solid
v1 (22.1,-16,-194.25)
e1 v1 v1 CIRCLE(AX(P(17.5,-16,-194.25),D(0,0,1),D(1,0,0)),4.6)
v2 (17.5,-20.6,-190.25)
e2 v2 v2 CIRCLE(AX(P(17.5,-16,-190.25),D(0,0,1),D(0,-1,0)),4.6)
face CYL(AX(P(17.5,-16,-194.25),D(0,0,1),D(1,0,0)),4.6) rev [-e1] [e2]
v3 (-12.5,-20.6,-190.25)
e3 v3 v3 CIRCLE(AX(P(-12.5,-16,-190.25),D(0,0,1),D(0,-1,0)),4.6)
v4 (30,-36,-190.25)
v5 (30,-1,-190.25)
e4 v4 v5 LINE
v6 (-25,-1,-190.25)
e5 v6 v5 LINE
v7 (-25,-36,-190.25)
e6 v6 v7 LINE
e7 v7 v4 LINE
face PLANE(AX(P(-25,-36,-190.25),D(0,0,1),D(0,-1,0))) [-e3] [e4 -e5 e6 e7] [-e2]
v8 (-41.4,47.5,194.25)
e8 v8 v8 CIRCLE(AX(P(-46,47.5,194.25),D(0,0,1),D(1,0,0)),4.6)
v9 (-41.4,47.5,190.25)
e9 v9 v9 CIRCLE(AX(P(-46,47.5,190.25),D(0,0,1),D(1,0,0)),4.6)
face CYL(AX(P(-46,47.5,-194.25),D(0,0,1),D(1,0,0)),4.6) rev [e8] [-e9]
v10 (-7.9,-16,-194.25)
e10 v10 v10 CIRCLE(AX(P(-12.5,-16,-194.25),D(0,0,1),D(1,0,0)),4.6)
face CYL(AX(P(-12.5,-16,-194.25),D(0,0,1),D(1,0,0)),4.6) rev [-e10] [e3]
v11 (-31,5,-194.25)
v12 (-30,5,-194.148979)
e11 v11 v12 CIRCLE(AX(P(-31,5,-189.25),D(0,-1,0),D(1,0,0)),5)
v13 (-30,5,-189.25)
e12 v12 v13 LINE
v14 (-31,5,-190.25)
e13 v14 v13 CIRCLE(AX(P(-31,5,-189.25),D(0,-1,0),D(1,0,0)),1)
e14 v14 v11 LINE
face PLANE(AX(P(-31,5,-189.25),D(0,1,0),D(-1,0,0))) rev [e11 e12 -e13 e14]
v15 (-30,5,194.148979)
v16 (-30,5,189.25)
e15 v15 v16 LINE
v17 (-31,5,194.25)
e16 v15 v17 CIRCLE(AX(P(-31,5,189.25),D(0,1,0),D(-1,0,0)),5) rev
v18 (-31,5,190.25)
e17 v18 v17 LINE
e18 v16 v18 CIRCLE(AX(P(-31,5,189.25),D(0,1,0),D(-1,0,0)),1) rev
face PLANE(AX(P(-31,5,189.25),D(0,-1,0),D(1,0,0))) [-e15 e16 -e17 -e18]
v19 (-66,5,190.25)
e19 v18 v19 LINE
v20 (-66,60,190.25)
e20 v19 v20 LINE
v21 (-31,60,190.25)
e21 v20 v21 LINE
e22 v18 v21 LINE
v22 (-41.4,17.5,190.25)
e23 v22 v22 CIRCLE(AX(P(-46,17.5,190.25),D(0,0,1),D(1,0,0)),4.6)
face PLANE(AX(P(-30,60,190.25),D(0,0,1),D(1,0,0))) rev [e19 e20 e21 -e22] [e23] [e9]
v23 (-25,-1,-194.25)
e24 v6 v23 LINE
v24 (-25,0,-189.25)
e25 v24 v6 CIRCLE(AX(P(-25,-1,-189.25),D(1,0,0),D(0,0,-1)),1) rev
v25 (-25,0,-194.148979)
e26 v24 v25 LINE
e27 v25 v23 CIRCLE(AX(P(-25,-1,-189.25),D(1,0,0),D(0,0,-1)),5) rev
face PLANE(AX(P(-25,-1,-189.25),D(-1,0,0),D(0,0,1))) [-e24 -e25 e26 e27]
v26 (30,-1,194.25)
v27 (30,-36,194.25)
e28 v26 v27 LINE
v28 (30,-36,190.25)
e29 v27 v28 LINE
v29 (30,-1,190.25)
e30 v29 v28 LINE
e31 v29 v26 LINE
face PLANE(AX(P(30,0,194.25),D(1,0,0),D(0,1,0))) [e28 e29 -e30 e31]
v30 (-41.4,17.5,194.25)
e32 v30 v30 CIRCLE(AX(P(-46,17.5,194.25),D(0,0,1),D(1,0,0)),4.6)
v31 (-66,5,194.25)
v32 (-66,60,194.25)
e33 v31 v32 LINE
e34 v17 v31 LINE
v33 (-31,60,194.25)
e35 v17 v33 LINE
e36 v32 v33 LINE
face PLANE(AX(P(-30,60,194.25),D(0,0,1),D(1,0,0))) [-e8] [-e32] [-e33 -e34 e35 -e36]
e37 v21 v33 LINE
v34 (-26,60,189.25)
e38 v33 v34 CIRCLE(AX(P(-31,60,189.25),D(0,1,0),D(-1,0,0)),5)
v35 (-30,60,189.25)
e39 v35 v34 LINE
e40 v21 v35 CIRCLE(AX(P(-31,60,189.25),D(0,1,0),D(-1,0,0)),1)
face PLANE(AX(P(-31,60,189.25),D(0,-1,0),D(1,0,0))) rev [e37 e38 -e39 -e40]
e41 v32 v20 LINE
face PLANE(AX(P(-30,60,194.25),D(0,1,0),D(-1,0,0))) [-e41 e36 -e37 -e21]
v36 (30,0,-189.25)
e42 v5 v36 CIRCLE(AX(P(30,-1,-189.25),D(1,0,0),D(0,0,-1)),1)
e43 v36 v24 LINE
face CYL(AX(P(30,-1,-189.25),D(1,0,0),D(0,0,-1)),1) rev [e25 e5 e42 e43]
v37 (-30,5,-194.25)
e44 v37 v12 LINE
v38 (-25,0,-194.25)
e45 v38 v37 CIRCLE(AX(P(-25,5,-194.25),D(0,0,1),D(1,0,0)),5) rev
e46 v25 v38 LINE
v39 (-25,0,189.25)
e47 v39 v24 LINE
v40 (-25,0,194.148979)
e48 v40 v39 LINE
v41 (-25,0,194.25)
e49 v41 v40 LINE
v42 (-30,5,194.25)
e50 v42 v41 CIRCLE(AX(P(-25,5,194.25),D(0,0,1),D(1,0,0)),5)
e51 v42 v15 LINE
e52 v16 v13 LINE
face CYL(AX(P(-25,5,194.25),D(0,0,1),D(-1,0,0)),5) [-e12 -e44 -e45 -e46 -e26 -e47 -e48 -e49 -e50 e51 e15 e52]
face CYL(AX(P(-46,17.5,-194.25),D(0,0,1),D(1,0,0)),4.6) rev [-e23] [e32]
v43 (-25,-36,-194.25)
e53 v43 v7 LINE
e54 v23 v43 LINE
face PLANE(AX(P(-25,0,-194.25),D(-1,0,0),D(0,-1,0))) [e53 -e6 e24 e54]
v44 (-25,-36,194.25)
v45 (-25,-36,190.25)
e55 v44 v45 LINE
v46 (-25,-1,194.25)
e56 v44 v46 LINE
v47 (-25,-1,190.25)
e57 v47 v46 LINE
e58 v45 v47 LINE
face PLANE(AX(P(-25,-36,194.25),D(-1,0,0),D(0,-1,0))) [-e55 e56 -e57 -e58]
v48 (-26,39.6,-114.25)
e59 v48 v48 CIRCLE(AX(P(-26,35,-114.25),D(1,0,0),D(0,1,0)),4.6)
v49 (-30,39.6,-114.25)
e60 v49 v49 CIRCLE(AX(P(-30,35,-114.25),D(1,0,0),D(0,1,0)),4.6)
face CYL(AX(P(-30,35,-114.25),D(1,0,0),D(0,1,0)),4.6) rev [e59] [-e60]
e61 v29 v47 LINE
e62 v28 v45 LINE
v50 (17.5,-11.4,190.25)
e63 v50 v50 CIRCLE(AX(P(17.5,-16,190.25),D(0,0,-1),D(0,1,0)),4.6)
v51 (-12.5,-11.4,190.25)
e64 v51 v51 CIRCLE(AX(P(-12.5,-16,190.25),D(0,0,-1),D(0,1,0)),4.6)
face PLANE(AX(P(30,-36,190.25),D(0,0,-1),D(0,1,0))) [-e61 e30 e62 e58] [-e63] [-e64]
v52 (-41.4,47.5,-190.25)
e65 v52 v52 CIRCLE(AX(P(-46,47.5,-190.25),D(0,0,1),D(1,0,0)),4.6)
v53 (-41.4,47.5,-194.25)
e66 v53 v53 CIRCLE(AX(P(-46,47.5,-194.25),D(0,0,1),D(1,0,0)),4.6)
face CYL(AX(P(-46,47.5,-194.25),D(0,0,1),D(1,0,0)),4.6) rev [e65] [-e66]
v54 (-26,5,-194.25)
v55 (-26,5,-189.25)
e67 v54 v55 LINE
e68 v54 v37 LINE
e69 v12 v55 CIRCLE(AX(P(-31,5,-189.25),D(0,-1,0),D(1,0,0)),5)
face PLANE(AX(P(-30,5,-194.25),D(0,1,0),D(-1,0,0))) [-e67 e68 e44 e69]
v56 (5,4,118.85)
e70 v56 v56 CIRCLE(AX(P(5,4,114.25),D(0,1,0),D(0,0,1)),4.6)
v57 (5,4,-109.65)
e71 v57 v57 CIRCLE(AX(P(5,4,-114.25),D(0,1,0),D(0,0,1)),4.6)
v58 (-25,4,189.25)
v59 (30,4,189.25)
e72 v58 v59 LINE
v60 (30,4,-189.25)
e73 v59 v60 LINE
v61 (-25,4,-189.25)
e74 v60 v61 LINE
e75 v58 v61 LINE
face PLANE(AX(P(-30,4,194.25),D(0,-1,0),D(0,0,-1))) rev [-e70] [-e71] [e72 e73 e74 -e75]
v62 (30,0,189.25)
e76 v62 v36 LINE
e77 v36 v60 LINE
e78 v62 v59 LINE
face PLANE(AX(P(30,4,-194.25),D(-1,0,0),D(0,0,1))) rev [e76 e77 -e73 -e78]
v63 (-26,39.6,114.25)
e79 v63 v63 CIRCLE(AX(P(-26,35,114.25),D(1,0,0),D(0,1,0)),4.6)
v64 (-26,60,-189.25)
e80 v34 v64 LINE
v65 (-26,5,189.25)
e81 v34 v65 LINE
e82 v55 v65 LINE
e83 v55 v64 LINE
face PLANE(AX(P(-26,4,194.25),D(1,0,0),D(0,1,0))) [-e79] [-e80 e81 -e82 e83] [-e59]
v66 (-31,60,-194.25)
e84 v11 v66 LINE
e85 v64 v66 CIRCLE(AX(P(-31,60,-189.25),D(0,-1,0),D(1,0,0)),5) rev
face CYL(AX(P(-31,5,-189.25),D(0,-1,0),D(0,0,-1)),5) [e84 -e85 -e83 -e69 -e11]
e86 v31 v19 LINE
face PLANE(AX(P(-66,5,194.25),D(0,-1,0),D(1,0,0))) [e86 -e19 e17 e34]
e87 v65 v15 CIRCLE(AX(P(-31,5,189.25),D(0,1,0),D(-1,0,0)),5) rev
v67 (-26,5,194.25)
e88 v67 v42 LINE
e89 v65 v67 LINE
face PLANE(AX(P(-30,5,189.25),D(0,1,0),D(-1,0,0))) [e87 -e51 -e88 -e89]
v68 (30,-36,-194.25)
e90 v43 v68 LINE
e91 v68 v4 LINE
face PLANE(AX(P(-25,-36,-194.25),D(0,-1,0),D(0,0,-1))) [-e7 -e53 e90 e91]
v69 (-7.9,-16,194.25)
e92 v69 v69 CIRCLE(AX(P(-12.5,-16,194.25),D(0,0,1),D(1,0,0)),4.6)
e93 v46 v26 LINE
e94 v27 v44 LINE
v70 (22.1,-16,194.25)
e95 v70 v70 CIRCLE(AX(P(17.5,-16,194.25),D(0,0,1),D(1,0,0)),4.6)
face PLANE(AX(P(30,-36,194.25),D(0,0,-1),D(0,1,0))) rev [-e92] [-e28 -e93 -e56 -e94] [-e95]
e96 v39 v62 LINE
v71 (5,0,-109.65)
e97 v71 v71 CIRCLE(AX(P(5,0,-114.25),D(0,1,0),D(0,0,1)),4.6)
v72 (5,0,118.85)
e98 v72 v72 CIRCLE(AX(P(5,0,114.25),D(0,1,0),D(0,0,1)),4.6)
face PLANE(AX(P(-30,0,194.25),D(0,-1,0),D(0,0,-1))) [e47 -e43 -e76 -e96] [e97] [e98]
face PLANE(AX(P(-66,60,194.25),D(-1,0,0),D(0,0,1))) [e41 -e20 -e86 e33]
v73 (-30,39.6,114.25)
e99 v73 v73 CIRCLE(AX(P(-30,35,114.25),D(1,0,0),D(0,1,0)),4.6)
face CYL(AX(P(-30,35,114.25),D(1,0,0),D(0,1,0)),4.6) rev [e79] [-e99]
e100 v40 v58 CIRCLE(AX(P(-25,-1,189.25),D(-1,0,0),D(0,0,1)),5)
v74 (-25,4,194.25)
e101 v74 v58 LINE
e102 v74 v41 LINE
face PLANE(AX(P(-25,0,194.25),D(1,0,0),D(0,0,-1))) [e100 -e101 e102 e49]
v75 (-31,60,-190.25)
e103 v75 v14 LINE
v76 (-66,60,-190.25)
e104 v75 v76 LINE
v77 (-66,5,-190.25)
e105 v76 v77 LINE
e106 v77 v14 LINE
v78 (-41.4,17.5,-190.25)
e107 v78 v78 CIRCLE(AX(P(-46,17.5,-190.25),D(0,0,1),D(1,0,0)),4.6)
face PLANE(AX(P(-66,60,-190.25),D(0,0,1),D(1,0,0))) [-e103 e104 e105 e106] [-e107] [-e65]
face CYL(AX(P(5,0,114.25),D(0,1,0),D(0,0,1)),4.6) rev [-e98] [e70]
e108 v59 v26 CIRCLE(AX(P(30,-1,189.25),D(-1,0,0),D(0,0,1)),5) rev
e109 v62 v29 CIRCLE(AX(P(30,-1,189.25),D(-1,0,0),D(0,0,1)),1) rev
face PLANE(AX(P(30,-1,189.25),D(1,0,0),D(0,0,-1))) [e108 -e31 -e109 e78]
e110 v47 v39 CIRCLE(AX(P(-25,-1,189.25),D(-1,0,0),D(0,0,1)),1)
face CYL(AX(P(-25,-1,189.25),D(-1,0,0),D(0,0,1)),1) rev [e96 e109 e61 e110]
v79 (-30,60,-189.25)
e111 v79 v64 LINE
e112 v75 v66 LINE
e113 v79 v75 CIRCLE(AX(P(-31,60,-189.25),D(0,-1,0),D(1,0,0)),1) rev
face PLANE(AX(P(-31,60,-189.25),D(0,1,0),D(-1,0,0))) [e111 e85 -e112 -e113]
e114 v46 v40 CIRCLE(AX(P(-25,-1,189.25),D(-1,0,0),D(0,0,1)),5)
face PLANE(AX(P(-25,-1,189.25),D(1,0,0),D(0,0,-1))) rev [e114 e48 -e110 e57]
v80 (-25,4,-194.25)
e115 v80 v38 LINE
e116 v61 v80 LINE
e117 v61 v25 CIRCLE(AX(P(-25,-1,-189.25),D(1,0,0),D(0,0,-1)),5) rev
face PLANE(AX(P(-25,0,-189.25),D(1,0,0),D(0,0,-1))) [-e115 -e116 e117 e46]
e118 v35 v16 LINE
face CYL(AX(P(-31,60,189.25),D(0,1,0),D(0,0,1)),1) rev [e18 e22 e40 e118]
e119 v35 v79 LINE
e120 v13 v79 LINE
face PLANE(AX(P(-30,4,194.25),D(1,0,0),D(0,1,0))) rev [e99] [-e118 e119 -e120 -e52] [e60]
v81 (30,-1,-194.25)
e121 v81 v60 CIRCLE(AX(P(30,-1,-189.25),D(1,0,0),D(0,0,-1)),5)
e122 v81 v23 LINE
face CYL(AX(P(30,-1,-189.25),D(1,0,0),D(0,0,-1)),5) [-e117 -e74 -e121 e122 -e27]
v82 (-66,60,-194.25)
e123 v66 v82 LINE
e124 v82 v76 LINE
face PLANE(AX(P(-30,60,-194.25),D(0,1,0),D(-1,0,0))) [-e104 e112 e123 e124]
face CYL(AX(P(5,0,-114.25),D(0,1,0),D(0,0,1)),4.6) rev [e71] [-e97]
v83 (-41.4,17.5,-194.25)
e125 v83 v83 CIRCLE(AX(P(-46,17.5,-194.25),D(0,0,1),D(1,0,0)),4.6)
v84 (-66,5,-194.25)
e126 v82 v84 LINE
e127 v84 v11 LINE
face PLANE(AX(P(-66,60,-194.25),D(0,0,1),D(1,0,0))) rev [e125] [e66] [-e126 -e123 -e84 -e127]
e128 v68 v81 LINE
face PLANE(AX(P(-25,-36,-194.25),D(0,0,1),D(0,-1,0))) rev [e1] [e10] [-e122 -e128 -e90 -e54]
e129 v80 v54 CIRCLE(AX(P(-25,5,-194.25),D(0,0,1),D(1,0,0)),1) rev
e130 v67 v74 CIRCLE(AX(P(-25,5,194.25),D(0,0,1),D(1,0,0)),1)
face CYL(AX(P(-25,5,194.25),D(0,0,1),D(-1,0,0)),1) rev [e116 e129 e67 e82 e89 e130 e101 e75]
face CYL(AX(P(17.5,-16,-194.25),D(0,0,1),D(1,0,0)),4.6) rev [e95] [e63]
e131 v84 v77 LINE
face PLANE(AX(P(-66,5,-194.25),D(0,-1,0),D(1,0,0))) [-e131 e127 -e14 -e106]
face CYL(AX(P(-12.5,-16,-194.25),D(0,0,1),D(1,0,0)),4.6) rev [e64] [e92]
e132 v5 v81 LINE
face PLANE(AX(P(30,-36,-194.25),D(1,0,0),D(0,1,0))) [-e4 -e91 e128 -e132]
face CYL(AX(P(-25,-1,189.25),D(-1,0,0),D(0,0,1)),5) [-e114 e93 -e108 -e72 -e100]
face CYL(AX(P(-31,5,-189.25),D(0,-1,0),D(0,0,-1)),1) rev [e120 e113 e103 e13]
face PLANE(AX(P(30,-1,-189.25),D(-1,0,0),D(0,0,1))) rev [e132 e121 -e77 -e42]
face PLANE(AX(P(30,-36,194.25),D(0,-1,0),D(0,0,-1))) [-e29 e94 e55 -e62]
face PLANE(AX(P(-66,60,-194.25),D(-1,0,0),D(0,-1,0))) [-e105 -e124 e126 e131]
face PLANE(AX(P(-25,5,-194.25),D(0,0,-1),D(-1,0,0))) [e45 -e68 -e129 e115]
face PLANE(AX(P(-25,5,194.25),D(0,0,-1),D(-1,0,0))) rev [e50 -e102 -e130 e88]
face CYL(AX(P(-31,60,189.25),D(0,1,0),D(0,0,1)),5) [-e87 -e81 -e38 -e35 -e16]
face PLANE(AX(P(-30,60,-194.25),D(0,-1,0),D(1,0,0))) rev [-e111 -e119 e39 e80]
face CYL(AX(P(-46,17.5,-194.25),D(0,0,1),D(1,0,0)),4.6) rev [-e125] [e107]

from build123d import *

# Parameters (mm, degrees)
SKETCH1_W                      = 60
SKETCH1_H                      = 388.5
BASE_FLANGE1_DEPTH             = 4
EDGE_FLANGE1_STRIP_W           = 18
EDGE_FLANGE1_STRIP_H           = 4
EDGE_FLANGE1_STRIP_CUT_DEPTH   = 388.5
EDGE_FLANGE1_DEPTH             = 388.5
EDGE_FLANGE2_STRIP_W           = 18
EDGE_FLANGE2_STRIP_H           = 4
EDGE_FLANGE2_STRIP_CUT_DEPTH   = 55
EDGE_FLANGE2_STRIP_2_W         = 18
EDGE_FLANGE2_STRIP_2_H         = 4
EDGE_FLANGE2_STRIP_CUT_2_DEPTH = 55
EDGE_FLANGE2_STRIP_3_W         = 18
EDGE_FLANGE2_STRIP_3_H         = 4
EDGE_FLANGE2_STRIP_CUT_3_DEPTH = 55
EDGE_FLANGE2_STRIP_4_W         = 18
EDGE_FLANGE2_STRIP_4_H         = 4
EDGE_FLANGE2_STRIP_CUT_4_DEPTH = 55
EDGE_FLANGE2_DEPTH             = 55
EDGE_FLANGE2_BEND_DEPTH        = 55
EDGE_FLANGE2_BEND_2_DEPTH      = 55
EDGE_FLANGE2_BEND_3_DEPTH      = 55
SKETCH18_R                     = 4.6
EXTRUDE1_DEPTH                 = 399.607890037
SKETCH19_R                     = 4.6
EXTRUDE2_DEPTH                 = 4
SKETCH20_R                     = 4.6
EXTRUDE3_DEPTH                 = 4


# Sheet-metal steps are written as plain solids
with BuildPart() as part:
    # Sketch1 → Base-Flange1 (new body)
    with BuildSketch(Plane(origin=(0, 0, 0), x_dir=(1, 0, 0), z_dir=(0, 1, 0))):
        Rectangle(SKETCH1_W, SKETCH1_H)
    extrude(amount=BASE_FLANGE1_DEPTH)

    # Edge-Flange1 strip (across the edge) → Edge-Flange1 strip cut (cut)
    with BuildSketch(Plane(origin=(-30, 4, -194.25), x_dir=(1, 0, 0), z_dir=(0, 0, 1))):
        with Locations((-4, -2)):
            Rectangle(EDGE_FLANGE1_STRIP_W, EDGE_FLANGE1_STRIP_H)
    extrude(amount=EDGE_FLANGE1_STRIP_CUT_DEPTH, mode=Mode.SUBTRACT)

    # Edge-Flange1 section (across the edge) → Edge-Flange1 (add)
    with BuildSketch(Plane(origin=(-30, 4, -194.25), x_dir=(1, 0, 0), z_dir=(0, 0, 1))):
        with BuildLine():
            Line((0, 1), (0, 56))
            Line((0, 56), (4, 56))
            Line((4, 56), (4, 1))
            ThreePointArc((4, 1), (4.292893219, 0.292893219), (5, 0))
            Line((5, 0), (5, -4))
            ThreePointArc((5, -4), (1.464466094, -2.535533906), (0, 1))
        make_face()
    extrude(amount=EDGE_FLANGE1_DEPTH)

    # Edge-Flange2 strip (across the edge) → Edge-Flange2 strip cut (cut)
    with BuildSketch(Plane(origin=(-30, 5, 194.25), x_dir=(0, 0, -1), z_dir=(0, 1, 0))):
        with Locations((-4, -2)):
            Rectangle(EDGE_FLANGE2_STRIP_W, EDGE_FLANGE2_STRIP_H)
    extrude(amount=EDGE_FLANGE2_STRIP_CUT_DEPTH, mode=Mode.SUBTRACT)

    # Edge-Flange2 strip 2 (across the edge) → Edge-Flange2 strip cut 2 (cut)
    with BuildSketch(Plane(origin=(30, 0, 194.25), x_dir=(0, 0, -1), z_dir=(-1, 0, 0))):
        with Locations((-4, -2)):
            Rectangle(EDGE_FLANGE2_STRIP_2_W, EDGE_FLANGE2_STRIP_2_H)
    extrude(amount=EDGE_FLANGE2_STRIP_CUT_2_DEPTH, mode=Mode.SUBTRACT)

    # Edge-Flange2 strip 3 (across the edge) → Edge-Flange2 strip cut 3 (cut)
    with BuildSketch(Plane(origin=(-30, 60, -194.25), x_dir=(0, 0, 1), z_dir=(0, -1, 0))):
        with Locations((-4, -2)):
            Rectangle(EDGE_FLANGE2_STRIP_3_W, EDGE_FLANGE2_STRIP_3_H)
    extrude(amount=EDGE_FLANGE2_STRIP_CUT_3_DEPTH, mode=Mode.SUBTRACT)

    # Edge-Flange2 strip 4 (across the edge) → Edge-Flange2 strip cut 4 (cut)
    with BuildSketch(Plane(origin=(-25, 0, -194.25), x_dir=(0, 0, 1), z_dir=(1, 0, 0))):
        with Locations((-4, -2)):
            Rectangle(EDGE_FLANGE2_STRIP_4_W, EDGE_FLANGE2_STRIP_4_H)
    extrude(amount=EDGE_FLANGE2_STRIP_CUT_4_DEPTH, mode=Mode.SUBTRACT)

    # Edge-Flange2 section (across the edge) → Edge-Flange2 (add)
    with BuildSketch(Plane(origin=(-30, 5, 194.25), x_dir=(0, 0, -1), z_dir=(0, 1, 0))):
        with BuildLine():
            Line((0, 1), (0, 36))
            Line((0, 36), (4, 36))
            Line((4, 36), (4, 1))
            ThreePointArc((4, 1), (4.292893219, 0.292893219), (5, 0))
            Line((5, 0), (5, -4))
            ThreePointArc((5, -4), (1.464466094, -2.535533906), (0, 1))
        make_face()
    extrude(amount=EDGE_FLANGE2_DEPTH)

    # Edge-Flange2 section 2 (across the edge) → Edge-Flange2 bend (add)
    with BuildSketch(Plane(origin=(30, 0, 194.25), x_dir=(0, 0, -1), z_dir=(-1, 0, 0))):
        with BuildLine():
            Line((0, 1), (0, 36))
            Line((0, 36), (4, 36))
            Line((4, 36), (4, 1))
            ThreePointArc((4, 1), (4.292893219, 0.292893219), (5, 0))
            Line((5, 0), (5, -4))
            ThreePointArc((5, -4), (1.464466094, -2.535533906), (0, 1))
        make_face()
    extrude(amount=EDGE_FLANGE2_BEND_DEPTH)

    # Edge-Flange2 section 3 (across the edge) → Edge-Flange2 bend 2 (add)
    with BuildSketch(Plane(origin=(-30, 60, -194.25), x_dir=(0, 0, 1), z_dir=(0, -1, 0))):
        with BuildLine():
            Line((0, 1), (0, 36))
            Line((0, 36), (4, 36))
            Line((4, 36), (4, 1))
            ThreePointArc((4, 1), (4.292893219, 0.292893219), (5, 0))
            Line((5, 0), (5, -4))
            ThreePointArc((5, -4), (1.464466094, -2.535533906), (0, 1))
        make_face()
    extrude(amount=EDGE_FLANGE2_BEND_2_DEPTH)

    # Edge-Flange2 section 4 (across the edge) → Edge-Flange2 bend 3 (add)
    with BuildSketch(Plane(origin=(-25, 0, -194.25), x_dir=(0, 0, 1), z_dir=(1, 0, 0))):
        with BuildLine():
            Line((0, 1), (0, 36))
            Line((0, 36), (4, 36))
            Line((4, 36), (4, 1))
            ThreePointArc((4, 1), (4.292893219, 0.292893219), (5, 0))
            Line((5, 0), (5, -4))
            ThreePointArc((5, -4), (1.464466094, -2.535533906), (0, 1))
        make_face()
    extrude(amount=EDGE_FLANGE2_BEND_3_DEPTH)

    # Sketch18 → Extrude1 (cut, through all)
    with BuildSketch(Plane.XY.offset(194.25)):
        with Locations((-46, 47.5)):
            Circle(SKETCH18_R)
        with Locations((-46, 17.5)):
            Circle(SKETCH18_R)
        with Locations((-12.5, -16)):
            Circle(SKETCH18_R)
        with Locations((17.5, -16)):
            Circle(SKETCH18_R)
    extrude(amount=-EXTRUDE1_DEPTH, mode=Mode.SUBTRACT)

    # Sketch19 → Extrude2 (cut)
    with BuildSketch(Plane(origin=(-26, 0, 0), x_dir=(0, 0, -1), z_dir=(1, 0, 0))):
        with Locations(Location((-114.25, 35, 0), (0, 0, 90))):
            Circle(SKETCH19_R)
        with Locations(Location((114.25, 35, 0), (0, 0, 90))):
            Circle(SKETCH19_R)
    extrude(amount=-EXTRUDE2_DEPTH, mode=Mode.SUBTRACT)

    # Sketch20 → Extrude3 (cut)
    with BuildSketch(Plane(origin=(0, 4, 0), x_dir=(1, 0, 0), z_dir=(0, 1, 0))):
        with Locations(Location((5, 114.25, 0), (0, 0, 270))):
            Circle(SKETCH20_R)
        with Locations(Location((5, -114.25, 0), (0, 0, 270))):
            Circle(SKETCH20_R)
    extrude(amount=-EXTRUDE3_DEPTH, mode=Mode.SUBTRACT)


solid = part.part
